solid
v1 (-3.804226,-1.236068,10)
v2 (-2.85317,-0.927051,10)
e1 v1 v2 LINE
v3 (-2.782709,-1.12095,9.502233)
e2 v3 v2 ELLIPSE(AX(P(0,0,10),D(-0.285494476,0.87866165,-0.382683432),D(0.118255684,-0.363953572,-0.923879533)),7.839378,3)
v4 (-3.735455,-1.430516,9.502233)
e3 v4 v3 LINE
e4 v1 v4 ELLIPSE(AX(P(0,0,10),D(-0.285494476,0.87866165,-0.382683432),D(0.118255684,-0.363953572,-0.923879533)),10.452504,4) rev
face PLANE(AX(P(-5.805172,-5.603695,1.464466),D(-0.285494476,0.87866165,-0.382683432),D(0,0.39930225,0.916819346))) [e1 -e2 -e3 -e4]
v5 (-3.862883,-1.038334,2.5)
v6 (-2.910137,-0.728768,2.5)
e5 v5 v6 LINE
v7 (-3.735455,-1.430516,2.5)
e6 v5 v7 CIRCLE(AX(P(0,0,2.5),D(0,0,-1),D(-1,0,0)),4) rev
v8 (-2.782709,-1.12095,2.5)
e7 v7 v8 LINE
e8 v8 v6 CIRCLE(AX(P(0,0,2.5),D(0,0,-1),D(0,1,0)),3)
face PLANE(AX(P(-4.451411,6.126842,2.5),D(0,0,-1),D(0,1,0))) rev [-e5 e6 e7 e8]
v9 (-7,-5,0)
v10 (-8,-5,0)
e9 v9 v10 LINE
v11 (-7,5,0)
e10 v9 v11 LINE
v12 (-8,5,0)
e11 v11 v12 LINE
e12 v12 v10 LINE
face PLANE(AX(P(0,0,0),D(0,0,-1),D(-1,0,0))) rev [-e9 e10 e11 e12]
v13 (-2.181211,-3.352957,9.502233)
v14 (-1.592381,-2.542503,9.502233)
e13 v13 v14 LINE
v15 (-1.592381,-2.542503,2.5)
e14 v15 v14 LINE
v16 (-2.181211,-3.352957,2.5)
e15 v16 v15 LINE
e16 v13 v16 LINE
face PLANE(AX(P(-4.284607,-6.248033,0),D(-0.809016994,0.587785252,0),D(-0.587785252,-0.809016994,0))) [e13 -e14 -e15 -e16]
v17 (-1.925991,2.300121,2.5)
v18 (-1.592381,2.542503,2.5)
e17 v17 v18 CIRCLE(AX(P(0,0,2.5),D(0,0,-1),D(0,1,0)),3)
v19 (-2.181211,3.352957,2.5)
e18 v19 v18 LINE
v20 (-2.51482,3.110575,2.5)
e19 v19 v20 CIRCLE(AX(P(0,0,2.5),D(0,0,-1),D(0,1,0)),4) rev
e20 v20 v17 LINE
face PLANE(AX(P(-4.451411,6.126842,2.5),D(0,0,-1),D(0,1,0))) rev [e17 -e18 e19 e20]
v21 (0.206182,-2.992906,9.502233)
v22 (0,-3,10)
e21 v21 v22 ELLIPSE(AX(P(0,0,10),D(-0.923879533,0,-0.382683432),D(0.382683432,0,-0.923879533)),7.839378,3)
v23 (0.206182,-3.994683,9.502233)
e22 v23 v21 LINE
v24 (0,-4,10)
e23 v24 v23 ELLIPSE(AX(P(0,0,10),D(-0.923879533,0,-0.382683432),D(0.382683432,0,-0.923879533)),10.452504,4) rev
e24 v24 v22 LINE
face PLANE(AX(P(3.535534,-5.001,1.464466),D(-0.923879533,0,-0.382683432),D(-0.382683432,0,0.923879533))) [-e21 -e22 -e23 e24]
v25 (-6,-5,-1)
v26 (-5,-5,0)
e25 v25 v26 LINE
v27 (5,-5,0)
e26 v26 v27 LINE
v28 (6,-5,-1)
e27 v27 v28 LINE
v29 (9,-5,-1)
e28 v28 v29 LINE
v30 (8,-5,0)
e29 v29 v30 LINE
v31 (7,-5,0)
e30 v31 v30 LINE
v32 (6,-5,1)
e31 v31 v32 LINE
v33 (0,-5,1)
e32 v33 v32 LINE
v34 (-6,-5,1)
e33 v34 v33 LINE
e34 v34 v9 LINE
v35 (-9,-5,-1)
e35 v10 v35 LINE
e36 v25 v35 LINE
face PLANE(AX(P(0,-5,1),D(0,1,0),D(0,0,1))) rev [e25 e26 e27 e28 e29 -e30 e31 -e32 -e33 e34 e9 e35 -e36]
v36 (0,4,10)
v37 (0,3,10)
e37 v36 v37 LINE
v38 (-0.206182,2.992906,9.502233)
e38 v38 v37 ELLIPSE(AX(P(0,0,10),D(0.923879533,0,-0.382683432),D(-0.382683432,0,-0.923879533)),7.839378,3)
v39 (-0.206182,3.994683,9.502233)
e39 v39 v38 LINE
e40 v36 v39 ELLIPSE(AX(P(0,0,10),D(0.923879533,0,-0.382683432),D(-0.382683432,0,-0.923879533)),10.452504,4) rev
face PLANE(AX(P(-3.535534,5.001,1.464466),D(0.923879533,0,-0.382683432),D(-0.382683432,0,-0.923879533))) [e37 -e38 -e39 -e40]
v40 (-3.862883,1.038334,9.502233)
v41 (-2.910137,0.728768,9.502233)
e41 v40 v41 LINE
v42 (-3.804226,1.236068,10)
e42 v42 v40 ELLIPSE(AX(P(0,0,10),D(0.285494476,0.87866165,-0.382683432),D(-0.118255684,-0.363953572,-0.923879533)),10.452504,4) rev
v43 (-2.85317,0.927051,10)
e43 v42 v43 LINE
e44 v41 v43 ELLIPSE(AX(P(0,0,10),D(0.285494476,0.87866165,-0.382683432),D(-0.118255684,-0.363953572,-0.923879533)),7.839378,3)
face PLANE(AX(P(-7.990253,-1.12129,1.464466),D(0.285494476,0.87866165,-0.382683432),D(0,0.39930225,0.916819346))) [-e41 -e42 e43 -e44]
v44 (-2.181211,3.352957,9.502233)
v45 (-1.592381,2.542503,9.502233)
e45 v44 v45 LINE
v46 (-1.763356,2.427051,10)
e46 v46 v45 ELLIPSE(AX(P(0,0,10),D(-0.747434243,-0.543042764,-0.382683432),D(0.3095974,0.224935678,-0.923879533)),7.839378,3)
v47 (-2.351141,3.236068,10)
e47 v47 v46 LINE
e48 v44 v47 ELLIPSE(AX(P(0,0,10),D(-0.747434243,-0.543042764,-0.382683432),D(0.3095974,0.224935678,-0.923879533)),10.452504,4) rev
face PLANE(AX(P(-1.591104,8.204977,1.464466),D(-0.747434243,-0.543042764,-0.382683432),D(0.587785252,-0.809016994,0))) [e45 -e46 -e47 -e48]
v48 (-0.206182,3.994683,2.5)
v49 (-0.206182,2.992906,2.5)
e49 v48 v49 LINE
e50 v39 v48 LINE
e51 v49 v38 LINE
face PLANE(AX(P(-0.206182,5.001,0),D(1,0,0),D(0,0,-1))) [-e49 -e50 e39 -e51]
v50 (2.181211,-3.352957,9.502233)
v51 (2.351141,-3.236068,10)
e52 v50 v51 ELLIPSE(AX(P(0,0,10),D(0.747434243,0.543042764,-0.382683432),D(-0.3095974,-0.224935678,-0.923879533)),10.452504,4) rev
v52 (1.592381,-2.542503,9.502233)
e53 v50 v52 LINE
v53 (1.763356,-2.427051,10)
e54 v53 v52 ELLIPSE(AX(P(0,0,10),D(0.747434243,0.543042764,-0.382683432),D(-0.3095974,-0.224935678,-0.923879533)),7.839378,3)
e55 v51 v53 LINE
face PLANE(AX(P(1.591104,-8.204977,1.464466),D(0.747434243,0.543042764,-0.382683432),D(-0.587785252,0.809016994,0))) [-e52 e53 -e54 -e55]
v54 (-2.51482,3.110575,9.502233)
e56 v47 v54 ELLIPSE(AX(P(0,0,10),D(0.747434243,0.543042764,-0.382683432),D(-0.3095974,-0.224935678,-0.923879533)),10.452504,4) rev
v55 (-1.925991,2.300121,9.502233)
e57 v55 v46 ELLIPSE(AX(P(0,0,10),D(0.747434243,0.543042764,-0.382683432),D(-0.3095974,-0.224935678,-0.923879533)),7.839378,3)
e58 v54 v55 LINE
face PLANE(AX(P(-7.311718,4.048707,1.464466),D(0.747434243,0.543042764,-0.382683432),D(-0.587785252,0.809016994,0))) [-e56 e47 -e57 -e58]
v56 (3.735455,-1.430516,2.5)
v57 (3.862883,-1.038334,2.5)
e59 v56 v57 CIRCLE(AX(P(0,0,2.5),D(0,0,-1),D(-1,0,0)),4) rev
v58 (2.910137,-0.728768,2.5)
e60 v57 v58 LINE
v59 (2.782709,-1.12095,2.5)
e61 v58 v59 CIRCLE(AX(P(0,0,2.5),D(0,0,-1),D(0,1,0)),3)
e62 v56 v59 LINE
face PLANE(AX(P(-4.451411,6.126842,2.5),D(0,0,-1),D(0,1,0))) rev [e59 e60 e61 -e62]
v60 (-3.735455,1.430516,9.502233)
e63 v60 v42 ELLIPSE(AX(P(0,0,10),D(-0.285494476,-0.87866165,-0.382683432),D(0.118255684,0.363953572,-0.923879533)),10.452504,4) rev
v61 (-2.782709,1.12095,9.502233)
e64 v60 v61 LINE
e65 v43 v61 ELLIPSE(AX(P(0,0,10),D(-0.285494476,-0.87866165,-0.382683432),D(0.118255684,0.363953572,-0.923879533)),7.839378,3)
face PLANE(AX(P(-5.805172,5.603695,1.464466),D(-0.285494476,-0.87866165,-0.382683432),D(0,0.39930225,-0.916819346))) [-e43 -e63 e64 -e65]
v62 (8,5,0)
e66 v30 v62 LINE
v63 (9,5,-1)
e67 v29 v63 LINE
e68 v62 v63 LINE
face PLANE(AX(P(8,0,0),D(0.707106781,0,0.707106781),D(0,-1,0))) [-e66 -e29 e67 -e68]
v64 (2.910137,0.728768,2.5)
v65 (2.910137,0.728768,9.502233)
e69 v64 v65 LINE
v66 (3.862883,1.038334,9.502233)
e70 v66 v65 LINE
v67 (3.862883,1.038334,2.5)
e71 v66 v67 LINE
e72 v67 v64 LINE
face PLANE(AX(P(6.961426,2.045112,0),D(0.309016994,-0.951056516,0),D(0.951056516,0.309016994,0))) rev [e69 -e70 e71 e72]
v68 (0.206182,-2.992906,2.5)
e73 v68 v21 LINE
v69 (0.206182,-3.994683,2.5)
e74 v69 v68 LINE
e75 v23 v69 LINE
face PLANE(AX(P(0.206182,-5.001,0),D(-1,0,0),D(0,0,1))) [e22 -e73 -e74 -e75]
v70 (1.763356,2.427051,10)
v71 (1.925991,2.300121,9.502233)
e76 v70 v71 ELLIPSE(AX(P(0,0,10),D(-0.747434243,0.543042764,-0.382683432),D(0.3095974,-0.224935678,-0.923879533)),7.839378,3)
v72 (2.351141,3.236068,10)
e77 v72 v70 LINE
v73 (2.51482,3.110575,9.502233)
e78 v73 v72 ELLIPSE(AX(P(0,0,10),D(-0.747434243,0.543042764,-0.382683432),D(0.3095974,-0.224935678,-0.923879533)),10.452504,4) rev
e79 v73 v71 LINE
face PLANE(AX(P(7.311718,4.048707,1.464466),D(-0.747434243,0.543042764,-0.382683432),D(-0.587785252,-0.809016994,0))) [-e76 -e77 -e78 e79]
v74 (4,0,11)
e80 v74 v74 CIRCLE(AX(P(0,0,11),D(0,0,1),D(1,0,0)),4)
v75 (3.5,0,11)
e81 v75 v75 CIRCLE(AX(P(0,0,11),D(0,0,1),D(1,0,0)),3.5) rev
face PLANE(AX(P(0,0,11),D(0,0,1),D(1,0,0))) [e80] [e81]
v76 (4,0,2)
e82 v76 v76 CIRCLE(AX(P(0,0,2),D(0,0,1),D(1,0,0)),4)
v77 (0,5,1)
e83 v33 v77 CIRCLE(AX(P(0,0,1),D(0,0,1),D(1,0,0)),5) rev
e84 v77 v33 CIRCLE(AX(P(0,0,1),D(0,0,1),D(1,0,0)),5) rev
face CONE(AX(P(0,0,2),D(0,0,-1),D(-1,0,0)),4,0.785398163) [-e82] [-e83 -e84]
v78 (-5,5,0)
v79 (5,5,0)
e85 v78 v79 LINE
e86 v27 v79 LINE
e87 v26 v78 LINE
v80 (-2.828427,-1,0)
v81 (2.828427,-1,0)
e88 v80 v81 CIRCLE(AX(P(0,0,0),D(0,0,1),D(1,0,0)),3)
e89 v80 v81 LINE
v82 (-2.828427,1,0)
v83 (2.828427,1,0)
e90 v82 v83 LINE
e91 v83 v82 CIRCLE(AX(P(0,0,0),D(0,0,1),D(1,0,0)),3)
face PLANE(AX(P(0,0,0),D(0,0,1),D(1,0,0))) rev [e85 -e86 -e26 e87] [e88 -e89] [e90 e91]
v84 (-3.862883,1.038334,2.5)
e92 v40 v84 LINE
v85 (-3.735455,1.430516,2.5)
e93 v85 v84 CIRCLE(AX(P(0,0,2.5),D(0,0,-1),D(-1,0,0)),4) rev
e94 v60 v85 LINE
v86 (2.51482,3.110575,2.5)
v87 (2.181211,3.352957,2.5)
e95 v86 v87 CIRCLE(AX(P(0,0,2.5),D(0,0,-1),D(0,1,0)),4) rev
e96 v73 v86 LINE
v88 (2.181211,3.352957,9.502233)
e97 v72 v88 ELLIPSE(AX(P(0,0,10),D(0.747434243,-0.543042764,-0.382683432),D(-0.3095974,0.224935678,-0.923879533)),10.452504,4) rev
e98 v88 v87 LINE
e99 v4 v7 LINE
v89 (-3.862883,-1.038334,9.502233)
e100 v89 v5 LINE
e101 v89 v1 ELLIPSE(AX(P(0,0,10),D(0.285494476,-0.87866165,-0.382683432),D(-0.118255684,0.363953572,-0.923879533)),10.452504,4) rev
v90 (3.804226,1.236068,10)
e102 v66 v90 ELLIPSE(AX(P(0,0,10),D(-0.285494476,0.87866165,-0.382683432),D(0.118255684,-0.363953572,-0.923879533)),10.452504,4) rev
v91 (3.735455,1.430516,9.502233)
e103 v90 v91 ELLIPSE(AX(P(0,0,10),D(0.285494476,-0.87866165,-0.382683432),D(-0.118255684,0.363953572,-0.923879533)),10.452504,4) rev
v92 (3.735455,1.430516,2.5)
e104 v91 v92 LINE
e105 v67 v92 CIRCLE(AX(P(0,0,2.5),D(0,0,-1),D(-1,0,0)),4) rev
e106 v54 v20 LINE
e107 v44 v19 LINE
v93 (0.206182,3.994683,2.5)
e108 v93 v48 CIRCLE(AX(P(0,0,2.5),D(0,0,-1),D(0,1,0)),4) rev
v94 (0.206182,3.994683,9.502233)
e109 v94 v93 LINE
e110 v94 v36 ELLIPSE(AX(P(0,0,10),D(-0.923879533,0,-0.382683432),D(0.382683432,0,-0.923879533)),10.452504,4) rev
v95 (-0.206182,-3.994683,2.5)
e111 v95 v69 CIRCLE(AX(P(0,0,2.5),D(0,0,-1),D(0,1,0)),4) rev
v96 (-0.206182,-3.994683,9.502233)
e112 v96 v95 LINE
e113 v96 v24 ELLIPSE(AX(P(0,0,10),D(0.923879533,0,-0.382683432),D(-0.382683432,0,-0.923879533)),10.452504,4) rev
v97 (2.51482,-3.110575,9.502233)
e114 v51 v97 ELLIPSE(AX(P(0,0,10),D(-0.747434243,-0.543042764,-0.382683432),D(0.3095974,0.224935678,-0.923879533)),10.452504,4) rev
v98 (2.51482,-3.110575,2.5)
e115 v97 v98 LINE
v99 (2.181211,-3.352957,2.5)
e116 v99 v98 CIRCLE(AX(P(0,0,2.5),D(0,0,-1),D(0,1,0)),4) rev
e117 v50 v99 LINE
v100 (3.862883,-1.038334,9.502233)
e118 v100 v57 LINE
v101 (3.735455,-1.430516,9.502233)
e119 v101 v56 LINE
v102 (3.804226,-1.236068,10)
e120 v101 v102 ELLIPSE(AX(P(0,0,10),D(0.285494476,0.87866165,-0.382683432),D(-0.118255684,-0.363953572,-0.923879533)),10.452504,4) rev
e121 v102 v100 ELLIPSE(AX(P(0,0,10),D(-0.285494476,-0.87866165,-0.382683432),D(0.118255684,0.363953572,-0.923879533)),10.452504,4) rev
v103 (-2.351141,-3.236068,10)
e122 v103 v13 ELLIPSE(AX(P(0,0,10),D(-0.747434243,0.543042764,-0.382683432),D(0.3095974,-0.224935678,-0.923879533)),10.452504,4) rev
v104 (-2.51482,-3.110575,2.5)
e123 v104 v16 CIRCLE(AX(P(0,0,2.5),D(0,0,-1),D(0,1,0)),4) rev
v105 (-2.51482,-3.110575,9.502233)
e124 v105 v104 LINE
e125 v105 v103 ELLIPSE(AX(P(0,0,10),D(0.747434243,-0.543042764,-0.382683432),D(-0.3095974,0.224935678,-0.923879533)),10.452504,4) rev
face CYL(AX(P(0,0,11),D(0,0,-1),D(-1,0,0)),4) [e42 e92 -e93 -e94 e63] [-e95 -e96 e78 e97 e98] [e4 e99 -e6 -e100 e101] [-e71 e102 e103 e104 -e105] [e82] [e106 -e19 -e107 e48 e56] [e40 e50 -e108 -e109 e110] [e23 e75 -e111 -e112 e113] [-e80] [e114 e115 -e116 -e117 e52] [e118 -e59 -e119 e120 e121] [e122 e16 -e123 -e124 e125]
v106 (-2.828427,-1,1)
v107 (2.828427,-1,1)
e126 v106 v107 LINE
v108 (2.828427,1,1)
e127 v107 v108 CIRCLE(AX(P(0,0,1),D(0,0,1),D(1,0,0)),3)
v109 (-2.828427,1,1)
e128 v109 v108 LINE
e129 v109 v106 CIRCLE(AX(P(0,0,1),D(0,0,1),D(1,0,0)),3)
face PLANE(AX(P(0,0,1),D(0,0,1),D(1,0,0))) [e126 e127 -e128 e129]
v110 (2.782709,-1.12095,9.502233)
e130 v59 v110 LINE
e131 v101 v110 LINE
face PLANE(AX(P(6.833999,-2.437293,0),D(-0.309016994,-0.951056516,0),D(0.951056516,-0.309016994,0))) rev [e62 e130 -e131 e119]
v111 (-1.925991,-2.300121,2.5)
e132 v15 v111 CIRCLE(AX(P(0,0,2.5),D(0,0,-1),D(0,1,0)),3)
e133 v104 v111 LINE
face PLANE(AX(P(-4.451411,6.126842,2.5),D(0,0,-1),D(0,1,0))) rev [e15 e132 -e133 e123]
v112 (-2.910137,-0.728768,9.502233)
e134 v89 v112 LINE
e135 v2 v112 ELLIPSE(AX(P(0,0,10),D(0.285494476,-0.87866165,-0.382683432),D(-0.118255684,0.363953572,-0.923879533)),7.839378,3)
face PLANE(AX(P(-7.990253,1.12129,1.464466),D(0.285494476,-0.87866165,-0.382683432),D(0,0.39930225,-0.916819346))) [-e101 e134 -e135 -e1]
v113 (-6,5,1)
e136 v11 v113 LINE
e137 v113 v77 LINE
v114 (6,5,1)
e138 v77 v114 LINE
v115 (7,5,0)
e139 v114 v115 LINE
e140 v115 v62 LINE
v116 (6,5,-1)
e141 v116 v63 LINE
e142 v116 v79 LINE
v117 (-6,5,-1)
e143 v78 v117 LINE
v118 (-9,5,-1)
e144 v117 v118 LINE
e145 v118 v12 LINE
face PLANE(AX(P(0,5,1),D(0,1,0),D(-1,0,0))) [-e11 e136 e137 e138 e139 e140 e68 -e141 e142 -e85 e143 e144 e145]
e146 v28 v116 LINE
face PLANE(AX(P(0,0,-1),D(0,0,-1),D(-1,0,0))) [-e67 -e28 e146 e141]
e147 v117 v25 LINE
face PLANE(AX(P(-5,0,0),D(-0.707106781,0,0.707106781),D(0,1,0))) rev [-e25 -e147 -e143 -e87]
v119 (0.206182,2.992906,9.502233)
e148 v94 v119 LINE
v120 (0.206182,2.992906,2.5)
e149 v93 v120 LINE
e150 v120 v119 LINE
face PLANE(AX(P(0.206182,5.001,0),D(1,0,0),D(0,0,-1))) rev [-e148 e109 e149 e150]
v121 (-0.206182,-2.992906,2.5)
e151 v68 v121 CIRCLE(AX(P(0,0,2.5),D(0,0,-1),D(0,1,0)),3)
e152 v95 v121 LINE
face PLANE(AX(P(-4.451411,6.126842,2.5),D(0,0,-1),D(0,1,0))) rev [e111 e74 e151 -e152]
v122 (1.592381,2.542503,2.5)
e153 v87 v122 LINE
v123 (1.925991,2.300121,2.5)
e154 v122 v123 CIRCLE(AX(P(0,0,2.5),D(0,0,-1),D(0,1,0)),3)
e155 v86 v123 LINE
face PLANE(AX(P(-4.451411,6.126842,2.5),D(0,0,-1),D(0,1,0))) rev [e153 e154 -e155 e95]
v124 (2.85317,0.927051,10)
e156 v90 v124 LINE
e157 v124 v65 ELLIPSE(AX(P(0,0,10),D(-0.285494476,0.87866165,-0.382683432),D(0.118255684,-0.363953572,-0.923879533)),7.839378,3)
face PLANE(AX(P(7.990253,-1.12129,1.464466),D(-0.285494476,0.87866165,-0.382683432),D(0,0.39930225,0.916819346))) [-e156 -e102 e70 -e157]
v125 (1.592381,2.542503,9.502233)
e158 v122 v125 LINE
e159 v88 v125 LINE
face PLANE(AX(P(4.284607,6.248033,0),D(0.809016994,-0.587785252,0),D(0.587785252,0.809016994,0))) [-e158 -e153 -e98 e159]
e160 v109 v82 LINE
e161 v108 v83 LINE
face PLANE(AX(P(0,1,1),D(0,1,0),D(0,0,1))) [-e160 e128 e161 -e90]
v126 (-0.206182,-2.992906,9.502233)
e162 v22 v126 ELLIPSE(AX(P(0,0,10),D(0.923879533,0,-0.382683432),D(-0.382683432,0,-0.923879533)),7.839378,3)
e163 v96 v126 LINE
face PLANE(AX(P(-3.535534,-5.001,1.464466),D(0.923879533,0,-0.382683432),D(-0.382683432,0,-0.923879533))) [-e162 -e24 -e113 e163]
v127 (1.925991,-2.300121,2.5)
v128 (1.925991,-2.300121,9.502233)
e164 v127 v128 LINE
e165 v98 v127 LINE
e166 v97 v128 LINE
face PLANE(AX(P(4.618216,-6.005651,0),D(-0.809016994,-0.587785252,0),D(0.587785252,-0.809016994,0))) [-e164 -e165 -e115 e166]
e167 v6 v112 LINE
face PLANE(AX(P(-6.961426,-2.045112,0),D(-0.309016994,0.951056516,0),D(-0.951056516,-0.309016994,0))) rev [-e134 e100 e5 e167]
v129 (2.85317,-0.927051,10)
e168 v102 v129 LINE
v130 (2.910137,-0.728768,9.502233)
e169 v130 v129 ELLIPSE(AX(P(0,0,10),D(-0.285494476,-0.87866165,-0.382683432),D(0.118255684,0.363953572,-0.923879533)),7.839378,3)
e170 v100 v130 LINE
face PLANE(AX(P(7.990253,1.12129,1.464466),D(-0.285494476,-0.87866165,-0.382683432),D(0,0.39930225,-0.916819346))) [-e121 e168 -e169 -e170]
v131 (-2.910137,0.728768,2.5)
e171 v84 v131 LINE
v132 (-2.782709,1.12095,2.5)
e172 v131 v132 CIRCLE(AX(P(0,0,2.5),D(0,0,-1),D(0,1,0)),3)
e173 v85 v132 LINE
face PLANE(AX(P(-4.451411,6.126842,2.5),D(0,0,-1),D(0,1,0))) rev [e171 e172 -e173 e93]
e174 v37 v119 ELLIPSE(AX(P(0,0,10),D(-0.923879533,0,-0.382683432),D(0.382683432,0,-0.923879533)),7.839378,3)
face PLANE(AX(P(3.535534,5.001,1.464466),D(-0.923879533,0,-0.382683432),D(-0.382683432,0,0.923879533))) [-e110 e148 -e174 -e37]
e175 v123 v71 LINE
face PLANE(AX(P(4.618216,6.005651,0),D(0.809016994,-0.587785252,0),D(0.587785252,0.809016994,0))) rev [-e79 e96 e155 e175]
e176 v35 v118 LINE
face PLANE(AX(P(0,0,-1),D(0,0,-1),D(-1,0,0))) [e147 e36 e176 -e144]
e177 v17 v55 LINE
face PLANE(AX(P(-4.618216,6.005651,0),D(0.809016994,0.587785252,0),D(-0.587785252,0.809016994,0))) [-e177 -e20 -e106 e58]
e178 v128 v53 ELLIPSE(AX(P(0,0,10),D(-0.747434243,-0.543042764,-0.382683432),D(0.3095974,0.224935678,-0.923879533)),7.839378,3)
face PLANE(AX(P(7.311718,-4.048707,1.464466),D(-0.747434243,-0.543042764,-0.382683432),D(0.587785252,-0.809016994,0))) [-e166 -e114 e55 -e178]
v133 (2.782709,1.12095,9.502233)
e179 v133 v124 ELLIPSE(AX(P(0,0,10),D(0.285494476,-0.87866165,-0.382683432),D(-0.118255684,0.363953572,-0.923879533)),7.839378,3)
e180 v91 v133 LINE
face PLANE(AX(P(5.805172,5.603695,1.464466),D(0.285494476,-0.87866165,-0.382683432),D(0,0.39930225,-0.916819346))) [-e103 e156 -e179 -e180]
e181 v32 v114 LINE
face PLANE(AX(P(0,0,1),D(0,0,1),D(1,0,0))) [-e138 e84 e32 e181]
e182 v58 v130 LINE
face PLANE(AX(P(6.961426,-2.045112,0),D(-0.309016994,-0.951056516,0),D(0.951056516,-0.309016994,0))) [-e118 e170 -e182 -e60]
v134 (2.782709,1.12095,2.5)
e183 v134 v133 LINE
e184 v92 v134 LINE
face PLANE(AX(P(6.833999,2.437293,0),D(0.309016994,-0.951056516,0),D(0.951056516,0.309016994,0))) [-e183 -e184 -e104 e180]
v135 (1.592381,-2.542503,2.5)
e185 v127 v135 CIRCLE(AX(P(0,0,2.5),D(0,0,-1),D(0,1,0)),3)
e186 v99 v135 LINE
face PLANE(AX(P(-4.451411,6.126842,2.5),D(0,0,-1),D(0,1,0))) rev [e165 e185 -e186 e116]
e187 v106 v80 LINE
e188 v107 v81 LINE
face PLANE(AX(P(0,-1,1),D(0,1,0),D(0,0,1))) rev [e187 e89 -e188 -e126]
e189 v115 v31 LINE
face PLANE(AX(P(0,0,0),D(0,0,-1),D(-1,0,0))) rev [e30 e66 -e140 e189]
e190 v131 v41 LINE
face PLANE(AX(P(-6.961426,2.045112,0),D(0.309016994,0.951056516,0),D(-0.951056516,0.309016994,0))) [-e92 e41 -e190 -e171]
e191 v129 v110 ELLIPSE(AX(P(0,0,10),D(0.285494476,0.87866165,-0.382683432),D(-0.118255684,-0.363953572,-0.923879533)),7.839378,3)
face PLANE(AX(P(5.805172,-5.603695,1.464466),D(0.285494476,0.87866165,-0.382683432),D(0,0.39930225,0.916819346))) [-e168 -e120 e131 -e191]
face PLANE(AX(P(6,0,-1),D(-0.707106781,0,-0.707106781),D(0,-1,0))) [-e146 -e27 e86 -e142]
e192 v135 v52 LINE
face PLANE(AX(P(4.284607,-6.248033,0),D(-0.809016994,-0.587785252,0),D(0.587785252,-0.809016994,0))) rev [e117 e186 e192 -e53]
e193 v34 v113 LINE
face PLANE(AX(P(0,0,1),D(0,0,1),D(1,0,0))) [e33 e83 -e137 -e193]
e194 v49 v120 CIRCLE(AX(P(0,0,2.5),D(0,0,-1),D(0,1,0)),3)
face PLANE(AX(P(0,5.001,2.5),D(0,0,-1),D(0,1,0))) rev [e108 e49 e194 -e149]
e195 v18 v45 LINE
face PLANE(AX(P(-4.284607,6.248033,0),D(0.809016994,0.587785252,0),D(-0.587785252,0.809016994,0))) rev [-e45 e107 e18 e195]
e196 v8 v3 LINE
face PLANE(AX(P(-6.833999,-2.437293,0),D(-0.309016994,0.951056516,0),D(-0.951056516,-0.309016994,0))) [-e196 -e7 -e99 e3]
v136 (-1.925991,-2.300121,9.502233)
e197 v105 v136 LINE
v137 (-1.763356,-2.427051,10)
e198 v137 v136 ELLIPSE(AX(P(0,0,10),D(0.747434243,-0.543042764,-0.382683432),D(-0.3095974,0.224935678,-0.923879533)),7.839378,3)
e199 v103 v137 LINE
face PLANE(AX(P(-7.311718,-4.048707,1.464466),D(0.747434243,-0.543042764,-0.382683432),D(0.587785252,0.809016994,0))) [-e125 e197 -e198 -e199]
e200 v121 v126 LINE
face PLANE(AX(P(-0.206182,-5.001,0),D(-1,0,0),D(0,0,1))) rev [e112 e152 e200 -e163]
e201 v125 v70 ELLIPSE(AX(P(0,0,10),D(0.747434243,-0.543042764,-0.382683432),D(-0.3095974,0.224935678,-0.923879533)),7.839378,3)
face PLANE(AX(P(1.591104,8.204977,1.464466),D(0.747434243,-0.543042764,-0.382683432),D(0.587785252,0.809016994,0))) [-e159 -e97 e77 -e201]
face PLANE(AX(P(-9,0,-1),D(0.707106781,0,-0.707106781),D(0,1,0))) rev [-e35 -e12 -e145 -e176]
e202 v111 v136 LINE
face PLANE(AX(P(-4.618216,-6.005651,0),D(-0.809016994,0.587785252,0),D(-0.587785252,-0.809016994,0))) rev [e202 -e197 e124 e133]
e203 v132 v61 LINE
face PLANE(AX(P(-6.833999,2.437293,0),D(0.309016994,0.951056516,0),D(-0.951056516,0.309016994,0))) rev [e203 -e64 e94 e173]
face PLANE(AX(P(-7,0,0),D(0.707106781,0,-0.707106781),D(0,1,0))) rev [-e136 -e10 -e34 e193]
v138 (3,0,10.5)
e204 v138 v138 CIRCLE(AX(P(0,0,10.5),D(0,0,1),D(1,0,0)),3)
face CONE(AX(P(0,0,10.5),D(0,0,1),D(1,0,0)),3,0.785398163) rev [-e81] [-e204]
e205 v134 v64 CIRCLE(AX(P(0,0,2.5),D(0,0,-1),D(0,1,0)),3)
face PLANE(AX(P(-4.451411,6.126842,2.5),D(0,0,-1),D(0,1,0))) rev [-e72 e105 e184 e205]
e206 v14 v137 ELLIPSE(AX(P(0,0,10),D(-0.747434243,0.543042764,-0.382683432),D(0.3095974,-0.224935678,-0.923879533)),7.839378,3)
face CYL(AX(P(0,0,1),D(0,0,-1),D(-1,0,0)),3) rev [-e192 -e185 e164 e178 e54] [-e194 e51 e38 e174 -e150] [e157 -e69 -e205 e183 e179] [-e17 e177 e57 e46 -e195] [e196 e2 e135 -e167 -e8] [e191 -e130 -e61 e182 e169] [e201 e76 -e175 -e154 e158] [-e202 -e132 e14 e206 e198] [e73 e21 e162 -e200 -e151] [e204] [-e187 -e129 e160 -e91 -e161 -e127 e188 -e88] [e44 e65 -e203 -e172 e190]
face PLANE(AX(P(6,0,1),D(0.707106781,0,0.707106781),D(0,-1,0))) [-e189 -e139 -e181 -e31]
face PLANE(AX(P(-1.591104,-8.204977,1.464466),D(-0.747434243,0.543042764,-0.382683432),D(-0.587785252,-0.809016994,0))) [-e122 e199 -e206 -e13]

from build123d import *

# Parameters (mm, degrees)
ESQUISSE1_W                  = 10
ESQUISSE1_H                  = 10
ESQUISSE1_R                  = 4
ESQUISSE1_R_2                = 3
ESQUISSE1_W_2                = 1
BOSS_EXTRU_1_DEPTH           = 1
ESQUISSE2_R                  = 4
BOSS_EXTRU_2_DEPTH           = 10
CHANFREIN1_SIZE              = 1
ENL_V_MAT_EXTRU_1_REACH      = 15.491
ENL_V_MAT_EXTRU_1_END_RADIUS = 4
ESQUISSE3_W                  = 0.41236409
ESQUISSE3_H                  = 6.00446502
ESQUISSE3_H_2                = 0.99776749
R_P_TITION_CIRCULAIRE1_COUNT = 10
ESQUISSE9_W                  = 4
ESQUISSE9_H                  = 10
BOSS_EXTRU_8_DEPTH           = 1
CHANFREIN2_SIZE              = 1


with BuildPart() as part:
    # Esquisse1 → Boss.-Extru.1 (new body)
    # profile 1 of 5: a face of its own
    with BuildSketch(Plane.XY):
        Rectangle(ESQUISSE1_W, ESQUISSE1_H)
        Circle(ESQUISSE1_R, mode=Mode.SUBTRACT)
    # profile 2 of 5: a face of its own
    with BuildSketch(Plane.XY):
        Circle(ESQUISSE1_R)
        Circle(ESQUISSE1_R_2, mode=Mode.SUBTRACT)
    # profile 3 of 5: a face of its own
    with BuildSketch(Plane.XY):
        with BuildLine():
            Line((2.828427125, 1), (-2.828427125, 1))
            ThreePointArc((-2.828427125, 1), (-3, 0), (-2.828427125, -1))
            Line((-2.828427125, -1), (2.828427125, -1))
            ThreePointArc((2.828427125, -1), (2.956795679, -0.507305936), (3, 0))
            ThreePointArc((3, 0), (2.956795679, 0.507305936), (2.828427125, 1))
        make_face()
    # profile 4 of 5: a face of its own
    with BuildSketch(Plane.XY):
        with Locations((-5.5, 0)):
            Rectangle(ESQUISSE1_W_2, ESQUISSE1_H)
    # profile 5 of 5: a face of its own
    with BuildSketch(Plane.XY):
        with Locations((5.5, 0)):
            Rectangle(ESQUISSE1_W_2, ESQUISSE1_H)
    extrude(amount=BOSS_EXTRU_1_DEPTH)

    # Esquisse2 → Boss.-Extru.2 (add)
    with BuildSketch(Plane.XY.offset(1)):
        Circle(ESQUISSE2_R)
        with BuildLine():
            ThreePointArc((2.828427125, 1), (2.956795679, 0.507305936), (3, 0))
            ThreePointArc((3, 0), (2.956795679, -0.507305936), (2.828427125, -1))
            ThreePointArc((2.828427125, -1), (0, -3), (-2.828427125, -1))
            ThreePointArc((-2.828427125, -1), (-3, 0), (-2.828427125, 1))
            ThreePointArc((-2.828427125, 1), (0, 3), (2.828427125, 1))
        make_face(mode=Mode.SUBTRACT)
    extrude(amount=BOSS_EXTRU_2_DEPTH)

    # Chanfrein1
    chanfrein1_edges = [part.edges().sort_by_distance(p)[0] for p in [
        (-4, 0, 1),
    ]]
    chamfer(chanfrein1_edges, length=CHANFREIN1_SIZE - 0.0001)  # a hair under: the kernel refuses the full size

    # Enlèv. mat.-Extru.1: up to this cylinder (the profile starts inside it)
    enl_v_mat_extru_1_end = Plane(origin=(0, 0, 6.3335195), z_dir=(0, 0, -1)) * Cylinder(ENL_V_MAT_EXTRU_1_END_RADIUS, 46.651271, mode=Mode.PRIVATE)
    # Esquisse3 → Enlèv. mat.-Extru.1 (cut, up to the surface)
    with BuildSketch(Plane(origin=(0, 0, 0), x_dir=(1, 0, 0), z_dir=(0, 1, 0)), mode=Mode.PRIVATE) as enl_v_mat_extru_1_sk1:
        with Locations((0, -6.5)):
            Rectangle(ESQUISSE3_W, ESQUISSE3_H)
    enl_v_mat_extru_1_tool1 = extrude(enl_v_mat_extru_1_sk1.sketch, amount=ENL_V_MAT_EXTRU_1_REACH, mode=Mode.PRIVATE) & enl_v_mat_extru_1_end
    # Esquisse3 → Enlèv. mat.-Extru.1 (cut, up to the surface)
    with BuildSketch(Plane(origin=(0, 0, 0), x_dir=(1, 0, 0), z_dir=(0, 1, 0)), mode=Mode.PRIVATE) as enl_v_mat_extru_1_sk2:
        with Locations((0, -2.998883745)):
            Rectangle(ESQUISSE3_W, ESQUISSE3_H_2)
    enl_v_mat_extru_1_tool2 = extrude(enl_v_mat_extru_1_sk2.sketch, amount=ENL_V_MAT_EXTRU_1_REACH, mode=Mode.PRIVATE) & enl_v_mat_extru_1_end
    # Esquisse3 → Enlèv. mat.-Extru.1 (cut, up to the surface)
    with BuildSketch(Plane(origin=(0, 0, 0), x_dir=(1, 0, 0), z_dir=(0, 1, 0)), mode=Mode.PRIVATE) as enl_v_mat_extru_1_sk3:
        Polygon((-0.206182045, -9.50223251), (0.206182045, -9.50223251), (0, -10), align=None)
    enl_v_mat_extru_1_tool3 = extrude(enl_v_mat_extru_1_sk3.sketch, amount=ENL_V_MAT_EXTRU_1_REACH, mode=Mode.PRIVATE) & enl_v_mat_extru_1_end
    enl_v_mat_extru_1 = enl_v_mat_extru_1_tool1.solids().sort_by_distance((0, 0, 6.5))[0] + enl_v_mat_extru_1_tool2.solids().sort_by_distance((0, 0, 2.998884))[0] + enl_v_mat_extru_1_tool3.solids().sort_by_distance((0, 0, 9.668155))[0]
    add(enl_v_mat_extru_1, mode=Mode.SUBTRACT)

    # Répétition circulaire1: Enlèv. mat.-Extru.1 ×10 about axis
    r_p_tition_circulaire1_axis = Axis((0, 0, 0), (0, 0, 1))
    for i in range(1, R_P_TITION_CIRCULAIRE1_COUNT):
        add(enl_v_mat_extru_1.rotate(r_p_tition_circulaire1_axis, i * 360 / R_P_TITION_CIRCULAIRE1_COUNT), mode=Mode.SUBTRACT)

    # Esquisse9 → Boss.-Extru.8 (add)
    with BuildSketch(Plane(origin=(0, 0, 0), x_dir=(-1, 0, 0), z_dir=(0, 0, -1))):
        with Locations((-7, 0)):
            Rectangle(ESQUISSE9_W, ESQUISSE9_H)
        with Locations((7, 0)):
            Rectangle(ESQUISSE9_W, ESQUISSE9_H)
    extrude(amount=BOSS_EXTRU_8_DEPTH)

    # Chanfrein2
    chanfrein2_edges = [part.edges().sort_by_distance(p)[0] for p in [
        (6, 0, 0),
        (5, 0, -1),
        (-6, 0, 0),
        (-5, 0, -1),
        (-9, 0, 0),
        (9, 0, 0),
    ]]
    chamfer(chanfrein2_edges, length=CHANFREIN2_SIZE - 0.0001)  # a hair under: the kernel refuses the full size

    # Chanfrein3: read off the stored shape, not the designer's step
    # Chanfrein3 outline → Chanfrein3 (revolve, cut)
    with BuildSketch(Plane.XZ):
        Polygon((3, 11), (3, 10.5), (3.5, 11), align=None)
    revolve(axis=Axis((0, 0, 0), (0, 0, 1)), mode=Mode.SUBTRACT)


solid = part.part
